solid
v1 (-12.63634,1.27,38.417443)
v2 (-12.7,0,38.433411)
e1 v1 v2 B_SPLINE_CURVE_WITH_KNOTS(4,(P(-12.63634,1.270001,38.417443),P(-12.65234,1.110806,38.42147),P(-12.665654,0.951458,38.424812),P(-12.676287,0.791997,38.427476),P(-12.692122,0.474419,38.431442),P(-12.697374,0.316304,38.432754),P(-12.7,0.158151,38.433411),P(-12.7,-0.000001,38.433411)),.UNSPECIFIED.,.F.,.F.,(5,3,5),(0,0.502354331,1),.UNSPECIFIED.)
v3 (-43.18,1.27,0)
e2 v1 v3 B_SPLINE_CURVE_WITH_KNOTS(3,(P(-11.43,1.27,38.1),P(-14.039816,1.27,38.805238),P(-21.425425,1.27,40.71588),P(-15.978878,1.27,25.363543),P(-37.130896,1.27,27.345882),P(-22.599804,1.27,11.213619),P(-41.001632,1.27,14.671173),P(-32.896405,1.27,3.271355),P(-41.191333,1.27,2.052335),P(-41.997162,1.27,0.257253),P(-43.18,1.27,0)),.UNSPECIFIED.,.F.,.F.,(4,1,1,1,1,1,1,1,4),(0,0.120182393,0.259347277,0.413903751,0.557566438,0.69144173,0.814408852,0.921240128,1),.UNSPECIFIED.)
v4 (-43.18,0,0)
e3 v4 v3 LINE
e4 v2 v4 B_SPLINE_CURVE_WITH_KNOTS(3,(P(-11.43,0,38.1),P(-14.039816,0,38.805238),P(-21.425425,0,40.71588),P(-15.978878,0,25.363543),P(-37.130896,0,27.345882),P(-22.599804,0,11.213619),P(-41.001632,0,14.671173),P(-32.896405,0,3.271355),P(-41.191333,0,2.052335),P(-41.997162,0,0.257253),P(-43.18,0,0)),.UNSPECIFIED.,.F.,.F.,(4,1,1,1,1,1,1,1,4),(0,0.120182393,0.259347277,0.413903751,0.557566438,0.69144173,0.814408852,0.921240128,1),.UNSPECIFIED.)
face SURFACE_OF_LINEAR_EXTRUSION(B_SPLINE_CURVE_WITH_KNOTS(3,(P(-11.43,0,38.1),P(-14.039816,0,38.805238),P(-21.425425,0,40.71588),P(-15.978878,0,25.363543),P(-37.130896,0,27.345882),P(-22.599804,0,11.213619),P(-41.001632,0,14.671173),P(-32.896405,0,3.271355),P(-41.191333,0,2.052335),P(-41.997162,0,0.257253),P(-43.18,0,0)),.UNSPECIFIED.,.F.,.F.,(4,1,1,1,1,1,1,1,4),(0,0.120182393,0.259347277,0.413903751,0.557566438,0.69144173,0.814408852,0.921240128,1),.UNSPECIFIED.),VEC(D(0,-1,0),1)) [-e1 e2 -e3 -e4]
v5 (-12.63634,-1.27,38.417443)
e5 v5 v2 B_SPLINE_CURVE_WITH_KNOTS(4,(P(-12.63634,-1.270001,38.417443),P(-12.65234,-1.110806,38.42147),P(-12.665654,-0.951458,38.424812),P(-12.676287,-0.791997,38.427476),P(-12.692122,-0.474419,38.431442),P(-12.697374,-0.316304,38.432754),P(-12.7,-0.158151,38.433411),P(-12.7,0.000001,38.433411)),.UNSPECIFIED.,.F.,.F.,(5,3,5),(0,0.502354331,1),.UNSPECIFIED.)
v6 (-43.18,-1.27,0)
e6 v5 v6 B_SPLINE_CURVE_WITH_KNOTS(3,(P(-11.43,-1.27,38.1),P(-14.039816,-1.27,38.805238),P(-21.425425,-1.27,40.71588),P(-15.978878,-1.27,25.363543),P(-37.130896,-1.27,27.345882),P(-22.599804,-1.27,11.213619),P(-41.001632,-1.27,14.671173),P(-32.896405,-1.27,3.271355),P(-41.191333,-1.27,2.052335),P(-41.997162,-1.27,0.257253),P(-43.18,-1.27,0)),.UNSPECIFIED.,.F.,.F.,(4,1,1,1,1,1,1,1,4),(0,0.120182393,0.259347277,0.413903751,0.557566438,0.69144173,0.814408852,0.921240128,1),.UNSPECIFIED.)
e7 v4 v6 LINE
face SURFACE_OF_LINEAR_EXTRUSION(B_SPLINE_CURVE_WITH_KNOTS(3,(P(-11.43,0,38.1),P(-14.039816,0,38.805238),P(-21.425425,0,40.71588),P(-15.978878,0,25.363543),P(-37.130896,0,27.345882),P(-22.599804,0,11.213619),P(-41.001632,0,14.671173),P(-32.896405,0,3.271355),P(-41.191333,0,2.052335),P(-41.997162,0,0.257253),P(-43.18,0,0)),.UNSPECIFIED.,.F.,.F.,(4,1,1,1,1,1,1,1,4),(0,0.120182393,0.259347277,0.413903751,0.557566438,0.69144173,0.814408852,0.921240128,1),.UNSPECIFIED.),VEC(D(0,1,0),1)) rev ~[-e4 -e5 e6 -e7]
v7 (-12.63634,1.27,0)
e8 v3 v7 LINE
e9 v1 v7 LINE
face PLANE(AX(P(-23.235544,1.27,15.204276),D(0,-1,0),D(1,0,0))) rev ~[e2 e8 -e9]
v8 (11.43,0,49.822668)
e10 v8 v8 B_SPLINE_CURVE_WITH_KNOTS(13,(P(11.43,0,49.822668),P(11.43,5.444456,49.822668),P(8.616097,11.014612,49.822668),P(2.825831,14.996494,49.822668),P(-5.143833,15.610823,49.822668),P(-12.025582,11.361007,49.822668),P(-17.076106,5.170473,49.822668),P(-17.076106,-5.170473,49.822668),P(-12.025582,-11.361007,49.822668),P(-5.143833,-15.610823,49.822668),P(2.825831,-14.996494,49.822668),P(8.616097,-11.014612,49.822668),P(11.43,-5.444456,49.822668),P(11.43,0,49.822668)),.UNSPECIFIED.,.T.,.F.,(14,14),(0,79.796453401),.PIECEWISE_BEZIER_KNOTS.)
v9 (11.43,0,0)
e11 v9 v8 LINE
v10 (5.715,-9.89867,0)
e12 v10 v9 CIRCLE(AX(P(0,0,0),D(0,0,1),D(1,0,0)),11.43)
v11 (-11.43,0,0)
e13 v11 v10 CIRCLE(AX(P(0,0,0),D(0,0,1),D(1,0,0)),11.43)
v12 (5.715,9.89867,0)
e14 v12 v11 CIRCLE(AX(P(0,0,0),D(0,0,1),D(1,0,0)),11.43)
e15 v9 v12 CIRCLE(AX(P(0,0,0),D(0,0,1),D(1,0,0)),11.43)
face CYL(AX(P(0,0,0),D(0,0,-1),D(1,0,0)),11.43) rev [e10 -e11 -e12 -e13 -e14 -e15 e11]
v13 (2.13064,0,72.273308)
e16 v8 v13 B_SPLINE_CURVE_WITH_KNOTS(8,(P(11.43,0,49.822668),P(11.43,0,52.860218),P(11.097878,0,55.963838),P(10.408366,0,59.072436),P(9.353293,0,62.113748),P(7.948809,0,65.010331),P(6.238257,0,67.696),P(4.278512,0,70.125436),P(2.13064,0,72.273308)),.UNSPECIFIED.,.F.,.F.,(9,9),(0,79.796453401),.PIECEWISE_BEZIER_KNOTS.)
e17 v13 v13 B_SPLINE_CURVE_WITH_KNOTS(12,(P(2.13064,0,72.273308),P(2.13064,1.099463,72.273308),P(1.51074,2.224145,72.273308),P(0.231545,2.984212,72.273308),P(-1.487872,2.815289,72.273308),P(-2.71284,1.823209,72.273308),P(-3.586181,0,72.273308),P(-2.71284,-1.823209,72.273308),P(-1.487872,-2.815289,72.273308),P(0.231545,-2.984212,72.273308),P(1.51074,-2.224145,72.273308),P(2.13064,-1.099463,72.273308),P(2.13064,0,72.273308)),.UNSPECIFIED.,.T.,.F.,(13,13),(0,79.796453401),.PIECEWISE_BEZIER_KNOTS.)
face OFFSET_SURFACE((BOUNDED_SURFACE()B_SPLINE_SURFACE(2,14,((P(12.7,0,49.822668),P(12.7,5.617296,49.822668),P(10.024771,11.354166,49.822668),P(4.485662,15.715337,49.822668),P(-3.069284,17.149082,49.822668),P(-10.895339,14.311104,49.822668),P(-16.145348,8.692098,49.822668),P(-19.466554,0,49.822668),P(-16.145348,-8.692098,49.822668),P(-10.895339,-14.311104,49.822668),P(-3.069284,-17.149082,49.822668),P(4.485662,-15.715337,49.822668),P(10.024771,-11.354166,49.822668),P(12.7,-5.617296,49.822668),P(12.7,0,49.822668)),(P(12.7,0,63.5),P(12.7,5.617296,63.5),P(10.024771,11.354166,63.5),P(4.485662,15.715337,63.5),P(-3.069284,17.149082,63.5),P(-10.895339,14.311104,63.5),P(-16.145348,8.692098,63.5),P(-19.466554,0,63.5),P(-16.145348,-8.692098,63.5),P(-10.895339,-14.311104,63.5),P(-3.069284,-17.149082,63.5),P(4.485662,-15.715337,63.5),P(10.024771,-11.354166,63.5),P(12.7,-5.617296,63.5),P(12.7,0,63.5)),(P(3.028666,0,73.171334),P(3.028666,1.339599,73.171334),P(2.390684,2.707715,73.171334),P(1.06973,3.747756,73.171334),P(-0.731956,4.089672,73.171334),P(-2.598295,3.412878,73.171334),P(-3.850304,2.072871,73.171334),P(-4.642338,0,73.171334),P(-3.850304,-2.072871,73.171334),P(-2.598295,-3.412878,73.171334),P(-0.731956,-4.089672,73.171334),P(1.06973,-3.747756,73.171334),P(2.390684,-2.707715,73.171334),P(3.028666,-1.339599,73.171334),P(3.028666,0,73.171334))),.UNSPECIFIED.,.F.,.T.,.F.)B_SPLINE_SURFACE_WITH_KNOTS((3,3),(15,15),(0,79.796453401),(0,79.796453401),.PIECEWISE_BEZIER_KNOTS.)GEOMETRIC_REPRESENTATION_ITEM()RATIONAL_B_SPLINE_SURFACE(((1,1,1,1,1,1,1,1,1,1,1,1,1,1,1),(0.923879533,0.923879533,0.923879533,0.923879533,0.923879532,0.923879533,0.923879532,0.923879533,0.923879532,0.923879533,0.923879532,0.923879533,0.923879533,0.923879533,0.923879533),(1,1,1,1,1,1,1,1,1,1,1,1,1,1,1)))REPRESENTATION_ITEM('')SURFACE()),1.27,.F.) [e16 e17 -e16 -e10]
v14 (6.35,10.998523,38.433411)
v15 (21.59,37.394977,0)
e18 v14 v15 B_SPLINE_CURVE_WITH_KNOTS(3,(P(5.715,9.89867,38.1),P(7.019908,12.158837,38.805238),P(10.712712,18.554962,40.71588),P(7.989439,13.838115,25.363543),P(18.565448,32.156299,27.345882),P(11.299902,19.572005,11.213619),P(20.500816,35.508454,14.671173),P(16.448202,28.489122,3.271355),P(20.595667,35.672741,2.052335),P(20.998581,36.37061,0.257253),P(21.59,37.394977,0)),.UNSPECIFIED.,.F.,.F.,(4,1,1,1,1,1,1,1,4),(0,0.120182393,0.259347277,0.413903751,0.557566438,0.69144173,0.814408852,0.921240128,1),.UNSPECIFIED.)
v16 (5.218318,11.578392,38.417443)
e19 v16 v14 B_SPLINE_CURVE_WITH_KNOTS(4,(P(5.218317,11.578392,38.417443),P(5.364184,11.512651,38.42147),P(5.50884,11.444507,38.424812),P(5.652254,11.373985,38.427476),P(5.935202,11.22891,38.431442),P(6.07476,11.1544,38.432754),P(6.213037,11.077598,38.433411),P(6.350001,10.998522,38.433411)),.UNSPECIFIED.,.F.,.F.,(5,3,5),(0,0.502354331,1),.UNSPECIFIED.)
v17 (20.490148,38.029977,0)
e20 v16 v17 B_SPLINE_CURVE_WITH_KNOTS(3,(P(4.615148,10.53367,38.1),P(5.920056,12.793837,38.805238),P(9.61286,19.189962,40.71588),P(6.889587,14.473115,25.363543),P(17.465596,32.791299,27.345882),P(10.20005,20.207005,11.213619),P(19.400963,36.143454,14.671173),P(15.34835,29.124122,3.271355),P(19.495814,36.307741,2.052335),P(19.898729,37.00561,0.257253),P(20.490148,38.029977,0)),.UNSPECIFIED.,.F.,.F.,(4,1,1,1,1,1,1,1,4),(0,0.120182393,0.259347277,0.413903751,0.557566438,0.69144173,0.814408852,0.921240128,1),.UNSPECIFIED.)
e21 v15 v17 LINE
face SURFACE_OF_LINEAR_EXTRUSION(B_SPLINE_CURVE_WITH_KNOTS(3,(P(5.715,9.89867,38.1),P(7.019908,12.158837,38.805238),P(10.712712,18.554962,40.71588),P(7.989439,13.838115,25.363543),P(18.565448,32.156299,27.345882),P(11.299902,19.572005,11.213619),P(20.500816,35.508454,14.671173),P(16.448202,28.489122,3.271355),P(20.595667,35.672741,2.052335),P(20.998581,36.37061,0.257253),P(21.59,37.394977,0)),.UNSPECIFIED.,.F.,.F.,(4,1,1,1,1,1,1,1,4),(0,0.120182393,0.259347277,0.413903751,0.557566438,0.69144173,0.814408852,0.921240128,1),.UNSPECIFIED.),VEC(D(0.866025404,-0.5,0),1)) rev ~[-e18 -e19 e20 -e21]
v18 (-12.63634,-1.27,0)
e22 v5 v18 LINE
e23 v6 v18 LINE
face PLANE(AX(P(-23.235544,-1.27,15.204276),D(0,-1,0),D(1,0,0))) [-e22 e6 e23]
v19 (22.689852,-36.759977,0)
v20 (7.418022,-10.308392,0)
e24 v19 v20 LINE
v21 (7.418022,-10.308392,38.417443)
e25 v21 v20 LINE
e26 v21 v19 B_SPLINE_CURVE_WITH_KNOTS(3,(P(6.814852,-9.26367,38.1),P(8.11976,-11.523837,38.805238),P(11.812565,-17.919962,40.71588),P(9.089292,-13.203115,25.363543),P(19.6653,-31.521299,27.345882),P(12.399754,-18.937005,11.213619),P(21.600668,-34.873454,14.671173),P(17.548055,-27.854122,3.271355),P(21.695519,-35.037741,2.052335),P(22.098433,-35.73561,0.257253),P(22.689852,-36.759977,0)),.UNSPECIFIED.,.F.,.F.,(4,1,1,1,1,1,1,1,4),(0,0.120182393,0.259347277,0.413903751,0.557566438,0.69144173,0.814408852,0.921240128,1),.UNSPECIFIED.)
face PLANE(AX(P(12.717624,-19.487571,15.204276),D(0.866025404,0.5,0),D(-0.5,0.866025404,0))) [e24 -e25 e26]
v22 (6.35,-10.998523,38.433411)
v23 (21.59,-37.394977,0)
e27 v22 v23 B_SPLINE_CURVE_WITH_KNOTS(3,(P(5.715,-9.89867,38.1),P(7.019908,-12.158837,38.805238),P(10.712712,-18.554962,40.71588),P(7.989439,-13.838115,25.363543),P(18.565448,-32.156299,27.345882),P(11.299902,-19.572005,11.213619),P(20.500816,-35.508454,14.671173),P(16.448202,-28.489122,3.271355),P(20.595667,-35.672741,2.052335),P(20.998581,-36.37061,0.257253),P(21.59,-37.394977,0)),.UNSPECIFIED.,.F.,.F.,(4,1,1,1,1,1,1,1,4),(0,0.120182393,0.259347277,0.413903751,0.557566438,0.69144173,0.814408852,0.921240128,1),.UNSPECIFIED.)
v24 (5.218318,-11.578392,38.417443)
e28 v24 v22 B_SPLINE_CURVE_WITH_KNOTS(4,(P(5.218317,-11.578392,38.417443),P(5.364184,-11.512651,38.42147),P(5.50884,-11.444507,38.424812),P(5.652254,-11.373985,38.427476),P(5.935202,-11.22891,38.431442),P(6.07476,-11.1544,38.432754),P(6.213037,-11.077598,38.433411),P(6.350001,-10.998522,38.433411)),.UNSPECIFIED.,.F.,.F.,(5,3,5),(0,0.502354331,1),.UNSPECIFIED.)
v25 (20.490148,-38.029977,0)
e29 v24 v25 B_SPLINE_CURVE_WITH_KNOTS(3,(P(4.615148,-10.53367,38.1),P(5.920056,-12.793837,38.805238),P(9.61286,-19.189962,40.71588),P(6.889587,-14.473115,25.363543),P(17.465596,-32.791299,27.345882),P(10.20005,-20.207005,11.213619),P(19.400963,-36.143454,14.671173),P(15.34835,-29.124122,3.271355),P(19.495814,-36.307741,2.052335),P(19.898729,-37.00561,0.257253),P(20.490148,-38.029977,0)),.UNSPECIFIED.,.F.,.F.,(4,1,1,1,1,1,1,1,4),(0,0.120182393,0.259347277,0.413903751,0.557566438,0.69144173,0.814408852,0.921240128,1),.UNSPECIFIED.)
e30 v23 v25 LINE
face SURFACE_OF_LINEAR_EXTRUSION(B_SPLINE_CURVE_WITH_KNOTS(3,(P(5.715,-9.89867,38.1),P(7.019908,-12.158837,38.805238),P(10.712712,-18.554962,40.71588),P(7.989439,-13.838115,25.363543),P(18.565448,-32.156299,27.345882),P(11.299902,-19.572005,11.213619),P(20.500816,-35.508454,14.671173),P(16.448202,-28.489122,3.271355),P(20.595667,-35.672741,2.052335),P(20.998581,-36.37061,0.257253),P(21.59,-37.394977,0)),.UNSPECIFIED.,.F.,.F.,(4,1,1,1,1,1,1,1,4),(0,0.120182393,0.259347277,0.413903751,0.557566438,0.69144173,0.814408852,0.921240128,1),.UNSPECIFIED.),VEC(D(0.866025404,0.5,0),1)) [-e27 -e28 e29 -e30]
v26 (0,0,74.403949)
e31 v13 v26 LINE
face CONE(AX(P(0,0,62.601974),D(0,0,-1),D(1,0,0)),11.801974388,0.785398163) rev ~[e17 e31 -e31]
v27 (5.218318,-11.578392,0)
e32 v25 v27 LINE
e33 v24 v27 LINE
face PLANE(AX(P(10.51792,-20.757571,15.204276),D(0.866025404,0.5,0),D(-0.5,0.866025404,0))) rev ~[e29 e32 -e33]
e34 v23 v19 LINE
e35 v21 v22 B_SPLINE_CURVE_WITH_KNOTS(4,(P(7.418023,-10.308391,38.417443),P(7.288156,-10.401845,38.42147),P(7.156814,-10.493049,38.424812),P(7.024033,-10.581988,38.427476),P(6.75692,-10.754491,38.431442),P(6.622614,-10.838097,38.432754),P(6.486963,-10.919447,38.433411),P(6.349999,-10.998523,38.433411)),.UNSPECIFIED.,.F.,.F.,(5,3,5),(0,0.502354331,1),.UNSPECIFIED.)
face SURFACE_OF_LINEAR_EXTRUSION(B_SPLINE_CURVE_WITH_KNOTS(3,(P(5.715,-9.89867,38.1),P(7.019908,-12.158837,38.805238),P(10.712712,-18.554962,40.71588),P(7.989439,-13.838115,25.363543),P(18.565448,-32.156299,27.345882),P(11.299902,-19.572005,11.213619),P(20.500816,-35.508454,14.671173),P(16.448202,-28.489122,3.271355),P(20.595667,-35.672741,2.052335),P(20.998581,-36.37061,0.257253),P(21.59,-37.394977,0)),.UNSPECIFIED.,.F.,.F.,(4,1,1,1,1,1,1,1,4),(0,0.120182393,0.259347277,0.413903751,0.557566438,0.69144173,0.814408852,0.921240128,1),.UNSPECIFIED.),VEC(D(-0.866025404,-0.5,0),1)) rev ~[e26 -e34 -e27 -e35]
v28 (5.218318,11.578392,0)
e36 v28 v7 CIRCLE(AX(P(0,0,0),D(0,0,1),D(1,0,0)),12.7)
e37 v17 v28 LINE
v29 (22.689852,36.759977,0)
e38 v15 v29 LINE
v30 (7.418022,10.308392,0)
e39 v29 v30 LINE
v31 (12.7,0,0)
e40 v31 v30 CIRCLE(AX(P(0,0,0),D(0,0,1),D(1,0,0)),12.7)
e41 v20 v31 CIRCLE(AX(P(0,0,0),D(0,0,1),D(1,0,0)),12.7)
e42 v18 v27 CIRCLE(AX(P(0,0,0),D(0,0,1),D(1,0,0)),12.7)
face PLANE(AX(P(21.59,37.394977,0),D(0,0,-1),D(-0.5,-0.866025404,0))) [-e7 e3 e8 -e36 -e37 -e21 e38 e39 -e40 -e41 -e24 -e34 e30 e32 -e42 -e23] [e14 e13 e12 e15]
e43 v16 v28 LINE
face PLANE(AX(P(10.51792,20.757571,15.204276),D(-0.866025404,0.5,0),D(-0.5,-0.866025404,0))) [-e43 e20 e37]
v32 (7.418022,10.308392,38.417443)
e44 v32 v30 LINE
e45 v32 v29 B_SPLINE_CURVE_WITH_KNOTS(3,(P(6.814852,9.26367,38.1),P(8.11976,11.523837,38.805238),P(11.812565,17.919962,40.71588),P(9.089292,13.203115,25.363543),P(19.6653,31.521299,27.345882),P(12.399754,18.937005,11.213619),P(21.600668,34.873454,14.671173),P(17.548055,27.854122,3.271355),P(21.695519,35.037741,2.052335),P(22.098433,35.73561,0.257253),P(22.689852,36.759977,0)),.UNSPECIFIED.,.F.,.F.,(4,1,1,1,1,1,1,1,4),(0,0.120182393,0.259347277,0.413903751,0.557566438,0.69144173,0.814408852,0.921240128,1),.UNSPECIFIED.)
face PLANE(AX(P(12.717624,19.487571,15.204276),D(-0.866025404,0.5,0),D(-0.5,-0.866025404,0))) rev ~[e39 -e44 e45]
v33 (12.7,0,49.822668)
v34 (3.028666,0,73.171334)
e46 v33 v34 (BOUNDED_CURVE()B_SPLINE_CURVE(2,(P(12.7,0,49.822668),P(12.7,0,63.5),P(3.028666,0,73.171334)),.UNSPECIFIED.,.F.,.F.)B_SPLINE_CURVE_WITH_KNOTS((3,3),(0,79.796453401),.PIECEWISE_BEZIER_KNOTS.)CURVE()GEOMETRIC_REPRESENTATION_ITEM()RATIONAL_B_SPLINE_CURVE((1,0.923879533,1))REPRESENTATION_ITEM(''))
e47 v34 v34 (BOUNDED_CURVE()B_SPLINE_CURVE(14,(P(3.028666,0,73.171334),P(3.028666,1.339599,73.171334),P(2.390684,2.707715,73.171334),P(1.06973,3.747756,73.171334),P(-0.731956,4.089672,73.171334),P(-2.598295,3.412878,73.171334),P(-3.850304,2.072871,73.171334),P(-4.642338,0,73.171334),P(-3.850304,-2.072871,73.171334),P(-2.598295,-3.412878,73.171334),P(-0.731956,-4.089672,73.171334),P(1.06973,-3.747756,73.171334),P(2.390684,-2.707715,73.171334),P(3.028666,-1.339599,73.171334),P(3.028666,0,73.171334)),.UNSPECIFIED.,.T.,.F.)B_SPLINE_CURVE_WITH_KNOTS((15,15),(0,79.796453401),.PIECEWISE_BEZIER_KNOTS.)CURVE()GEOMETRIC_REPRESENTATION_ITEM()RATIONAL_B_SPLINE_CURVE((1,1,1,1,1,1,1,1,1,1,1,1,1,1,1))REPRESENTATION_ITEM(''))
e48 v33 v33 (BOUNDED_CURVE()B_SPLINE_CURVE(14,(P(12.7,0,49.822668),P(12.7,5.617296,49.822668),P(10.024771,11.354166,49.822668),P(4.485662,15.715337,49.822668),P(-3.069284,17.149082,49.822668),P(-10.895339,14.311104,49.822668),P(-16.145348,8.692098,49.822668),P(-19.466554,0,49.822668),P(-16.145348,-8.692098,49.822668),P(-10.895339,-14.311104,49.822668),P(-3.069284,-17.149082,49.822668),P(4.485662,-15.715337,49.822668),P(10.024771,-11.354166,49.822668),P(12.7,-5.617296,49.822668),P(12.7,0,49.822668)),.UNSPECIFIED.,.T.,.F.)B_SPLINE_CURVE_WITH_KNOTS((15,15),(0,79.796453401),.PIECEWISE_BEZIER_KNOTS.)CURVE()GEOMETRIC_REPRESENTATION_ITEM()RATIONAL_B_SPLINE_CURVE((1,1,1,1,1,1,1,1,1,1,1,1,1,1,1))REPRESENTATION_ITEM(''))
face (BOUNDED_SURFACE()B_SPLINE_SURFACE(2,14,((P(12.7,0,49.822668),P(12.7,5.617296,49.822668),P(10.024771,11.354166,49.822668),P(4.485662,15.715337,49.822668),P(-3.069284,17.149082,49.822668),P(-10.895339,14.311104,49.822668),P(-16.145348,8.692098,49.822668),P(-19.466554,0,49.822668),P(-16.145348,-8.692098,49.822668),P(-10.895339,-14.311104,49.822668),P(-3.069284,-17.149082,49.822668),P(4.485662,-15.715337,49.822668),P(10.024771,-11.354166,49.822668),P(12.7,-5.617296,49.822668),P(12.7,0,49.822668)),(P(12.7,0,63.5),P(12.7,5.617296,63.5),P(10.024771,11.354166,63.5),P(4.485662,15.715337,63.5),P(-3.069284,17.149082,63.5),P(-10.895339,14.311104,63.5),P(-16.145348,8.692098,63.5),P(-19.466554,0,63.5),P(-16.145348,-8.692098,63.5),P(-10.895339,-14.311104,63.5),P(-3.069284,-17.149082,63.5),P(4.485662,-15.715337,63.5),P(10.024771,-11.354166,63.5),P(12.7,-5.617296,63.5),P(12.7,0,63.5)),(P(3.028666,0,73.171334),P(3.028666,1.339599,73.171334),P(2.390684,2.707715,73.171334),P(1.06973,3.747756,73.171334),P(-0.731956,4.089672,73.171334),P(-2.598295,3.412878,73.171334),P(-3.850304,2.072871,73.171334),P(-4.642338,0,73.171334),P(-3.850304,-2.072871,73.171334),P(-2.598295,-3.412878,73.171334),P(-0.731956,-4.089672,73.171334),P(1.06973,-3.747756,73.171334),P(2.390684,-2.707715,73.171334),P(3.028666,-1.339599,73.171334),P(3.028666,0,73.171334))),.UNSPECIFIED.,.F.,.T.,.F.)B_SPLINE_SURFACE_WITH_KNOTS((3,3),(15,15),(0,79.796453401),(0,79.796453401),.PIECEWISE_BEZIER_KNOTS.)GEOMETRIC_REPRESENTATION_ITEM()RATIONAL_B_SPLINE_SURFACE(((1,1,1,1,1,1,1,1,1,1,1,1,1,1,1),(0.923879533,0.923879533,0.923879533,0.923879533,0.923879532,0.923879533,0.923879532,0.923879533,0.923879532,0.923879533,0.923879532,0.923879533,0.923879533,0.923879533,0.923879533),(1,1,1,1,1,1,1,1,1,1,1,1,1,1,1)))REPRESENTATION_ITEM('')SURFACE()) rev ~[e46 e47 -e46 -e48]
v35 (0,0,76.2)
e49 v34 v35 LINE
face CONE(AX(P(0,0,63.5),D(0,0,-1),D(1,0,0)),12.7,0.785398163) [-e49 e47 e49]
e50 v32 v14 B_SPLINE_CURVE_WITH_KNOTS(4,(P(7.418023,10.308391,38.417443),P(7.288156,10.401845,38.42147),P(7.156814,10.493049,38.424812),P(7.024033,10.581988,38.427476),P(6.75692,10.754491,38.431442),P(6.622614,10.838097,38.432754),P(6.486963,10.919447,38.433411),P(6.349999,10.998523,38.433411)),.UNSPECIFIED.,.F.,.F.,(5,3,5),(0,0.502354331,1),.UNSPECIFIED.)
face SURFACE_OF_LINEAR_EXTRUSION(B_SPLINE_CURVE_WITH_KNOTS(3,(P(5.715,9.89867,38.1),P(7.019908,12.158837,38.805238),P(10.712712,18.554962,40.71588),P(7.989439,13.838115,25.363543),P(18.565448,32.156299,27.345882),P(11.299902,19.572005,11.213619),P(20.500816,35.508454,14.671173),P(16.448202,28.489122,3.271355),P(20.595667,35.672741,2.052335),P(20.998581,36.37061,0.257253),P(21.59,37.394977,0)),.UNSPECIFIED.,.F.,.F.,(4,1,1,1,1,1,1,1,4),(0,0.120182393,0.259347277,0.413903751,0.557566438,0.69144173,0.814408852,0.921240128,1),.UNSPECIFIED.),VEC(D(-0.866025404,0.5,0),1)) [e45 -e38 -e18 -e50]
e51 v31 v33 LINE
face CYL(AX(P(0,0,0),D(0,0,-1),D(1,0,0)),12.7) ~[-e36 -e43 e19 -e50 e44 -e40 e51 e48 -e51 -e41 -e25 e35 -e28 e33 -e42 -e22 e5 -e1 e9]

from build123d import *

# Parameters (mm, degrees)
F0_R            = 12.7
F1_DEPTH        = 76.2
F2_SIZE         = 12.7
F3_R            = 33.02
F4_T            = -1.27
F6_DEPTH        = 1.27
F6_COPIES_COUNT = 3


# Not quite as in the source:
# - a feature of the source that left no trace in its solid (it failed there, or was rolled back) is left out
# - a pattern or mirror of a feature is missing from the dataset's text; its kind, count and spacing are read off the source's solid


with BuildPart() as f1:
    # F0 (on Top) → F1 (new body)
    with BuildSketch(Plane.XY):
        Circle(F0_R)
    extrude(amount=F1_DEPTH)

    # F2
    f2_edges = [f1.edges().sort_by_distance(p)[0] for p in [
        (-12.7, 0, 76.2),
    ]]
    chamfer(f2_edges, length=F2_SIZE)

    # F3
    f3_edges = [f1.edges().sort_by_distance(p)[0] for p in [
        (-12.7, 0, 63.5),
    ]]
    fillet(f3_edges, radius=F3_R)

    # F4
    f4_openings = [f1.faces().sort_by_distance(p)[0] for p in [
        (0, 0, 0),
    ]]
    offset(amount=F4_T, openings=f4_openings)

    # F5 (on Front) → F6 (join, symmetric)
    with BuildSketch(Plane.XZ):
        with BuildLine():
            Line((-43.18, 0), (-11.43, 0))
            Line((-11.43, 0), (-11.43, 38.1))
            add(Edge.make_bspline(
                [(-11.43, 38.1), (-14.0398158155, 38.8052379758), (-21.4254245672, 40.7158801474), (-15.9788784795, 25.3635431222), (-37.1308960464, 27.3458822388), (-22.5998042996, 11.213618898), (-41.0016315, 14.671173077), (-32.8964049327, 3.2713549274), (-41.191333005, 2.0523352832), (-41.9971624056, 0.2572525646), (-43.18, 0)],
                knots=[0, 0, 0, 0, 0.1201823933, 0.2593472766, 0.4139037511, 0.5575664377, 0.6914417304, 0.8144088518, 0.9212401283, 1, 1, 1, 1], degree=3))
        make_face()
    f6 = extrude(amount=F6_DEPTH, both=True)

    # F6_copies: F6 ×3 about axis
    f6_copies_axis = Axis((0, 0, 0), (0, 0, 1))
    for i in range(1, F6_COPIES_COUNT):
        add(f6.rotate(f6_copies_axis, i * 360 / F6_COPIES_COUNT))


solid = f1.part
